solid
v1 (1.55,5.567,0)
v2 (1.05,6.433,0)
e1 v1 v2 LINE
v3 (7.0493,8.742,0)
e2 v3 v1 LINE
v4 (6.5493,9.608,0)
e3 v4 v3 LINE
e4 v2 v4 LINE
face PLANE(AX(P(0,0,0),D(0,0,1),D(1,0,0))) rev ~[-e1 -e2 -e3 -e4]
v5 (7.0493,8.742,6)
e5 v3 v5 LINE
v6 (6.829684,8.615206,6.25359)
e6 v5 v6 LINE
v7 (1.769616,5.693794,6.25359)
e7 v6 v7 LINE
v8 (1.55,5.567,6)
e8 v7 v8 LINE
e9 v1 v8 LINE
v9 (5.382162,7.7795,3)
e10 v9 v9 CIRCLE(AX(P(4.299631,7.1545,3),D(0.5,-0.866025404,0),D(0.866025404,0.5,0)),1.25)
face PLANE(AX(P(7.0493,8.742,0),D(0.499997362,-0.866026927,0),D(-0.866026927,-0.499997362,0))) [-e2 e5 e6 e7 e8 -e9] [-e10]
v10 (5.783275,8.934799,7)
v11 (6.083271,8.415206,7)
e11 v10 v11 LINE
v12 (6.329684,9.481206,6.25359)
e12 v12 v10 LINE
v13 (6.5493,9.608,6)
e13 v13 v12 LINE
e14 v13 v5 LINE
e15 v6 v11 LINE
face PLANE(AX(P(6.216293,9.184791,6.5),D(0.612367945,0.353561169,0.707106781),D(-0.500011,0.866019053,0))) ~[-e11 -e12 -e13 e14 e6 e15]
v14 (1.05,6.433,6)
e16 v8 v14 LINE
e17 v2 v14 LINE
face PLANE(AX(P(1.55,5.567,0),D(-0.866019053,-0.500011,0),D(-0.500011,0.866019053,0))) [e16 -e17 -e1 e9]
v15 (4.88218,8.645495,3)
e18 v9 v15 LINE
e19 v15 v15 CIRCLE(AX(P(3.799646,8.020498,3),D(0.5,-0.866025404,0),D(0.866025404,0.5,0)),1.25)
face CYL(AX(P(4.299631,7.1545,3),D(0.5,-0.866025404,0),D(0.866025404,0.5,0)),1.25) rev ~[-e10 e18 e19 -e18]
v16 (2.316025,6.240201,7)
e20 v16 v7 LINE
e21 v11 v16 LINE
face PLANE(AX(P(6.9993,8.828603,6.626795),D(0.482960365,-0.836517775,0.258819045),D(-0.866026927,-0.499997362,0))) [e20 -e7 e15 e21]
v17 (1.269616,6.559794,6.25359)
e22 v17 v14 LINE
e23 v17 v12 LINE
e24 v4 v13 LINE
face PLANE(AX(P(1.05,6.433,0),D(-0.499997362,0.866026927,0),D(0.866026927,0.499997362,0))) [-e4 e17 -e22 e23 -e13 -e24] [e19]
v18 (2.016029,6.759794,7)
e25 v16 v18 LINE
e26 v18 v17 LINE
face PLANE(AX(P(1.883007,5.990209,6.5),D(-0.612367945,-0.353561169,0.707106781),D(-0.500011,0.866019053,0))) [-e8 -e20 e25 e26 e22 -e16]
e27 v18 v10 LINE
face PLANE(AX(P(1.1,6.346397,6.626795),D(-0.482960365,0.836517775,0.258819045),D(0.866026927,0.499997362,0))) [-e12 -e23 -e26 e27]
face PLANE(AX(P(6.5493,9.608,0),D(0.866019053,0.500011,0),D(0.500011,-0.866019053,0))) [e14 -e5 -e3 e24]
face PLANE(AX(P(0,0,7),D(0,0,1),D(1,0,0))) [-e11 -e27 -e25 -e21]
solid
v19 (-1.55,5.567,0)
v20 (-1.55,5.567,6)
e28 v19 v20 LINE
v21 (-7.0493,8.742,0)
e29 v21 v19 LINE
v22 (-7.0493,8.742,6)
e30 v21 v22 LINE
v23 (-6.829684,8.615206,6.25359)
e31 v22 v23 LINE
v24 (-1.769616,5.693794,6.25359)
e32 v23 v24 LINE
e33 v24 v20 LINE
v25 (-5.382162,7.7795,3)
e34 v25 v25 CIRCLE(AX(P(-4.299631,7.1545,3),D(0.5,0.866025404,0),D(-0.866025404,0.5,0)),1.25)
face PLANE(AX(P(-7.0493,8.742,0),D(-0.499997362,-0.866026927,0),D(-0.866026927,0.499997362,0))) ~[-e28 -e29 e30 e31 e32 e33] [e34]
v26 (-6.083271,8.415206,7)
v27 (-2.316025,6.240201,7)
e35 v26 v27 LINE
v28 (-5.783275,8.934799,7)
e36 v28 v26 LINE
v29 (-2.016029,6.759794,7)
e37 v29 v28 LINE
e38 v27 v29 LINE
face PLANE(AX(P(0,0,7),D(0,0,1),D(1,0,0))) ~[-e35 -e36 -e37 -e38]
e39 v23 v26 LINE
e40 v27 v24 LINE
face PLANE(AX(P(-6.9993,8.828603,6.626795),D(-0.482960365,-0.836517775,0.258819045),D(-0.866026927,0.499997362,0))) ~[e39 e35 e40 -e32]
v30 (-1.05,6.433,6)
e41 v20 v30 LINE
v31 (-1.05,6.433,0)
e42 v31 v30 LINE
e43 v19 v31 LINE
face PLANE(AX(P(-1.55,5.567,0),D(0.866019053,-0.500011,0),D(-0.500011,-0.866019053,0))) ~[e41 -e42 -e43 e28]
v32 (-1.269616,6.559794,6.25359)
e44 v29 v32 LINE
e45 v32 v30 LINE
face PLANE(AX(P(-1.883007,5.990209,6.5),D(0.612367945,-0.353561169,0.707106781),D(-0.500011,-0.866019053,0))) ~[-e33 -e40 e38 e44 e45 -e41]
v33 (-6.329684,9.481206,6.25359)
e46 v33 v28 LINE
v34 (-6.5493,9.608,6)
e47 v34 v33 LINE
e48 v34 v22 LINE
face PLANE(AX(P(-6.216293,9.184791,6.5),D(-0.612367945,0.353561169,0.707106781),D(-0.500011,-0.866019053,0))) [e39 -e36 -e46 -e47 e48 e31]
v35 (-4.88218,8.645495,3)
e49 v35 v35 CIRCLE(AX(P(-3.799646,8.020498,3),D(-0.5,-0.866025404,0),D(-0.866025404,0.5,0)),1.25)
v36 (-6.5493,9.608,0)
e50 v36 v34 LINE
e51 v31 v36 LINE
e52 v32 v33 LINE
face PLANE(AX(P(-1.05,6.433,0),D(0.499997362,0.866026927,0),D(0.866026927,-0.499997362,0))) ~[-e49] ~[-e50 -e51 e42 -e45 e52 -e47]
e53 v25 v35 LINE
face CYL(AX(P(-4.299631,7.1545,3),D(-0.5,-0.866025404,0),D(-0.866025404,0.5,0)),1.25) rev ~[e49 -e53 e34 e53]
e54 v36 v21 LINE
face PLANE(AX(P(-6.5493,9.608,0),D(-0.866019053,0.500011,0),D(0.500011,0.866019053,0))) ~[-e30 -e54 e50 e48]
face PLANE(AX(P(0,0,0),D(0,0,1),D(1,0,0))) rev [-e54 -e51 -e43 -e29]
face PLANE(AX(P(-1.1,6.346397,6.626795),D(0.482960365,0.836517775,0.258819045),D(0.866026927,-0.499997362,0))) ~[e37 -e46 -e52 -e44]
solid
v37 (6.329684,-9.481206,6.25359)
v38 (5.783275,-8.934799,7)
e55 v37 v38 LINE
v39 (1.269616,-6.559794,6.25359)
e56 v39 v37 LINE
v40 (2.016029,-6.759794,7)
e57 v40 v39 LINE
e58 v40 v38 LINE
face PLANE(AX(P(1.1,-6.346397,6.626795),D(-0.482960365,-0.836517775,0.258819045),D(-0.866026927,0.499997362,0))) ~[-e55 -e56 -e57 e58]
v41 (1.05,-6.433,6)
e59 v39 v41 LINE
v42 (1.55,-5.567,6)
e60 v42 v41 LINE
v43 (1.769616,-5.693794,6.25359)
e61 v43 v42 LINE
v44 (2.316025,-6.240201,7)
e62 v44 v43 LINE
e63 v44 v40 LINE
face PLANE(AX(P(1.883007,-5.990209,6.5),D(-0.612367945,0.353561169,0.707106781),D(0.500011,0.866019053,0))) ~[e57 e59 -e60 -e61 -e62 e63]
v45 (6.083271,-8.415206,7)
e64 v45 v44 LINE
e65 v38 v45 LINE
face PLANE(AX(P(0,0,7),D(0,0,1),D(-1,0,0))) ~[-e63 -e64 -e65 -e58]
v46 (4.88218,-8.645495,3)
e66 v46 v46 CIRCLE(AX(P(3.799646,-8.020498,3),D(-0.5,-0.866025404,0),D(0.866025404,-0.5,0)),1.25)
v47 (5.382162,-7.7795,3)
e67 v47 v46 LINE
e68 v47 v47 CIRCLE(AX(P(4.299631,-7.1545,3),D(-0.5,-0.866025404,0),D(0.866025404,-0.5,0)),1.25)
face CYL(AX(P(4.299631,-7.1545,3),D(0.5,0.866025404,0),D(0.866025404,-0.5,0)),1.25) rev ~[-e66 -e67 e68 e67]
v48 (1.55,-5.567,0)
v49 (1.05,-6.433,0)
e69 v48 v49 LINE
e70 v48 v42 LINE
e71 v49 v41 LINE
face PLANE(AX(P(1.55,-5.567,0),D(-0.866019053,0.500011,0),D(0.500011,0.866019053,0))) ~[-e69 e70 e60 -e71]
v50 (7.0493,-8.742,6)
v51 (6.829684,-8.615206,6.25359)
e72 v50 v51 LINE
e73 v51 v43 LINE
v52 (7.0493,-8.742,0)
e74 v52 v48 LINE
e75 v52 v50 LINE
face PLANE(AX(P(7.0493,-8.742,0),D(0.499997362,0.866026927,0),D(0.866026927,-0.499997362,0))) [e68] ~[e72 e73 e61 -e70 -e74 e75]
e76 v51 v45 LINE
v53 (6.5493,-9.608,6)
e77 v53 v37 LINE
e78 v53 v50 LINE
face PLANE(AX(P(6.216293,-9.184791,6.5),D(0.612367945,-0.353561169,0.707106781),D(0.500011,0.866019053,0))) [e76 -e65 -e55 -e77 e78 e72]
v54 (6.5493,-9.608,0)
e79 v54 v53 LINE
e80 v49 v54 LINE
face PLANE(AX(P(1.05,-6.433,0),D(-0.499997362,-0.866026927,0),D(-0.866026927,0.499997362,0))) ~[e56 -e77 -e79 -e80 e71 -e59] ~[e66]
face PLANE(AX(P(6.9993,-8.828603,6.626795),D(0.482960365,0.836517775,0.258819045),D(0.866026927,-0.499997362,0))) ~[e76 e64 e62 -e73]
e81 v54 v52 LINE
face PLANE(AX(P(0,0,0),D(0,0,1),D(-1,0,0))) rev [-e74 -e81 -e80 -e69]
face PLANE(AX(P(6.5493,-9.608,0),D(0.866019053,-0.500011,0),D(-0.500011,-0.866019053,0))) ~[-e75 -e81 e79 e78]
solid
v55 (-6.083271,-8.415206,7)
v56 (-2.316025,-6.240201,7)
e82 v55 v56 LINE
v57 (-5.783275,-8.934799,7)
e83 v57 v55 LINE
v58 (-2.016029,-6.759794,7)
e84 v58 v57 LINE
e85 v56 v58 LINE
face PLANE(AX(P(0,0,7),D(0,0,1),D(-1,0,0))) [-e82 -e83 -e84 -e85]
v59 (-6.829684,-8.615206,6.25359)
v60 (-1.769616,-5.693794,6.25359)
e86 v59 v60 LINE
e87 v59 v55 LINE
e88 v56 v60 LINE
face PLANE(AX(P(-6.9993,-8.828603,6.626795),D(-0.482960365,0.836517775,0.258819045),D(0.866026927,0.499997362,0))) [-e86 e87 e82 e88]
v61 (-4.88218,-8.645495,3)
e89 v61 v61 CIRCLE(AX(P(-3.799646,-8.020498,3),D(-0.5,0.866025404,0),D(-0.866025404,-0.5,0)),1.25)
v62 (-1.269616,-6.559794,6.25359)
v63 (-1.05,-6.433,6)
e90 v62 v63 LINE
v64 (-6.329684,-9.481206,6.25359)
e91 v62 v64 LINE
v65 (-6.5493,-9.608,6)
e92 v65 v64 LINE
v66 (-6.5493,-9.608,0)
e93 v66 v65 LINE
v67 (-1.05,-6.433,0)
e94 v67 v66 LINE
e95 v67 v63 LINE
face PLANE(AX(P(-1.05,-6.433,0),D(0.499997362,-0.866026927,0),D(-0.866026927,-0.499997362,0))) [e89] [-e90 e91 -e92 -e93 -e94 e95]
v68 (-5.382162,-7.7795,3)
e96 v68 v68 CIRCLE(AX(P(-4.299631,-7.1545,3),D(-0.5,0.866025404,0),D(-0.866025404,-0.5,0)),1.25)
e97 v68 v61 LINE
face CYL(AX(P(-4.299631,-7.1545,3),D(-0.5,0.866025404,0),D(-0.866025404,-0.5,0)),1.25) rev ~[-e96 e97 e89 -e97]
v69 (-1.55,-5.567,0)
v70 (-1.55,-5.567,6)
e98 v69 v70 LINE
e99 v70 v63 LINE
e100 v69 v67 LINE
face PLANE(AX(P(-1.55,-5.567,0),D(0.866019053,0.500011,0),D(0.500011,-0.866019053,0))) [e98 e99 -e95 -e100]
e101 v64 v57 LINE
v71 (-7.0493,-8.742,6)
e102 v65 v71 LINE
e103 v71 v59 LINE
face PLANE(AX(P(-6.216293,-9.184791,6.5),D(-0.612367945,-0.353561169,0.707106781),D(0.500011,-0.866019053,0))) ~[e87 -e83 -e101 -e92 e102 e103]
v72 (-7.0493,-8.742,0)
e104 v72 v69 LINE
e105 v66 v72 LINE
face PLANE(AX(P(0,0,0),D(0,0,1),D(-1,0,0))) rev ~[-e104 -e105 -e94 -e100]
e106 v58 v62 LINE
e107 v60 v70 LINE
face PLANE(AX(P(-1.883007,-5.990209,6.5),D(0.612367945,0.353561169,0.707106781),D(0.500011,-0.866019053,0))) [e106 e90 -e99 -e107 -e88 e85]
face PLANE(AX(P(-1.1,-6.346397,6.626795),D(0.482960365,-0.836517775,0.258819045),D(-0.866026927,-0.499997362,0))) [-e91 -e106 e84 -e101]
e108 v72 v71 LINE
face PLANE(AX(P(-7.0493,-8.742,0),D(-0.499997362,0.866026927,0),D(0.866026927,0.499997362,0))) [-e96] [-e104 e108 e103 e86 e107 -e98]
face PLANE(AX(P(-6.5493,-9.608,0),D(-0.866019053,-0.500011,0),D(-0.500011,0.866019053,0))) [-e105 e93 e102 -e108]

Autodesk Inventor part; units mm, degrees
ref_plane "YZ Plane" through (0, 0, 0) normal (1, 0, 0) x (0, 1, 0)
ref_plane "XZ Plane" through (0, 0, 0) normal (0, 1, 0) x (-1, 0, 0)
ref_plane "XY Plane" through (0, 0, 0) normal (0, 0, 1) x (1, 0, 0)
sketch "Эскиз1" plane through (0, 0, 0) normal (0, 0, 1) x (1, 0, 0)
  arc A0 (3.0397, -11.35) -> (11.3865, -2.9) centre (0, 0) ccw projected
  arc A1 (-3.0397, 11.35) -> (-3.0397, -11.35) centre (0, 0) ccw projected
  arc A2 (11.3865, 2.9) -> (3.0397, 11.35) centre (0, 0) ccw projected
  line L0 (0, 11.5515) -> (0, -11.5515) construction
  line L1 (-11.75, 0) -> (11.75, 0) construction
  line L2 (6.5493, 9.608) -> (7.0493, 8.742)
  line L3 (7.0493, 8.742) -> (1.55, 5.567)
  line L4 (1.55, 5.567) -> (1.05, 6.433)
  line L5 (1.05, 6.433) -> (6.5493, 9.608)
  line L6 (6.7993, 9.175) -> (1.3, 6) construction
  point P0 (0, 0)
  point P1 (0, 0)
  dimension "d0" = 1
  dimension "d1" = 6.35
  dimension "d2" = 30
  dimension "d3" = 12
  dimension "d4" = 2.6
extrude "Выдавливание1" add sketch "Эскиз1" along normal blind 7
chamfer "Фаска1" distance 0.2 angle 75 2 edges at (4.2996, 7.1545, 7) (3.7996, 8.0205, 7) measured on face at (5.0495, 7.9723, 7)
chamfer "Фаска2" distance 1 angle 45 2 edges at (1.3, 6, 7) (6.7993, 9.175, 7)
sketch "Эскиз2" plane through (1.55, 5.567, 0) normal (0.5, -0.8660254, 0) x (0.8660254, 0.5, 0)
  circle A0 centre (3.175, 3) radius 1.25
  line L0 (5.35, 7) -> (1, 7) projected
  line L1 (6.35, 0) -> (0, 0) projected
  line L2 (3.175, 7) -> (3.175, 0) construction
  point P0 (-4.1258, 0)
  dimension "d13" = 2.5
  dimension "d14" = 4
extrude "Выдавливание2" cut sketch "Эскиз2" against normal up to next
pattern_circular "Круговой массив1" count 2 over 360 about axis through (0, 0, -10) along (0, 0, 1) of "Выдавливание1", "Фаска1", "Фаска2", "Выдавливание2"
mirror "Зеркальное отражение1" about plane through (0, 0, 0) normal (1, 0, 0) of "Выдавливание1", "Фаска1", "Фаска2", "Выдавливание2", "Круговой массив1"
properties part number "contact" material "Нержавеющая сталь"
